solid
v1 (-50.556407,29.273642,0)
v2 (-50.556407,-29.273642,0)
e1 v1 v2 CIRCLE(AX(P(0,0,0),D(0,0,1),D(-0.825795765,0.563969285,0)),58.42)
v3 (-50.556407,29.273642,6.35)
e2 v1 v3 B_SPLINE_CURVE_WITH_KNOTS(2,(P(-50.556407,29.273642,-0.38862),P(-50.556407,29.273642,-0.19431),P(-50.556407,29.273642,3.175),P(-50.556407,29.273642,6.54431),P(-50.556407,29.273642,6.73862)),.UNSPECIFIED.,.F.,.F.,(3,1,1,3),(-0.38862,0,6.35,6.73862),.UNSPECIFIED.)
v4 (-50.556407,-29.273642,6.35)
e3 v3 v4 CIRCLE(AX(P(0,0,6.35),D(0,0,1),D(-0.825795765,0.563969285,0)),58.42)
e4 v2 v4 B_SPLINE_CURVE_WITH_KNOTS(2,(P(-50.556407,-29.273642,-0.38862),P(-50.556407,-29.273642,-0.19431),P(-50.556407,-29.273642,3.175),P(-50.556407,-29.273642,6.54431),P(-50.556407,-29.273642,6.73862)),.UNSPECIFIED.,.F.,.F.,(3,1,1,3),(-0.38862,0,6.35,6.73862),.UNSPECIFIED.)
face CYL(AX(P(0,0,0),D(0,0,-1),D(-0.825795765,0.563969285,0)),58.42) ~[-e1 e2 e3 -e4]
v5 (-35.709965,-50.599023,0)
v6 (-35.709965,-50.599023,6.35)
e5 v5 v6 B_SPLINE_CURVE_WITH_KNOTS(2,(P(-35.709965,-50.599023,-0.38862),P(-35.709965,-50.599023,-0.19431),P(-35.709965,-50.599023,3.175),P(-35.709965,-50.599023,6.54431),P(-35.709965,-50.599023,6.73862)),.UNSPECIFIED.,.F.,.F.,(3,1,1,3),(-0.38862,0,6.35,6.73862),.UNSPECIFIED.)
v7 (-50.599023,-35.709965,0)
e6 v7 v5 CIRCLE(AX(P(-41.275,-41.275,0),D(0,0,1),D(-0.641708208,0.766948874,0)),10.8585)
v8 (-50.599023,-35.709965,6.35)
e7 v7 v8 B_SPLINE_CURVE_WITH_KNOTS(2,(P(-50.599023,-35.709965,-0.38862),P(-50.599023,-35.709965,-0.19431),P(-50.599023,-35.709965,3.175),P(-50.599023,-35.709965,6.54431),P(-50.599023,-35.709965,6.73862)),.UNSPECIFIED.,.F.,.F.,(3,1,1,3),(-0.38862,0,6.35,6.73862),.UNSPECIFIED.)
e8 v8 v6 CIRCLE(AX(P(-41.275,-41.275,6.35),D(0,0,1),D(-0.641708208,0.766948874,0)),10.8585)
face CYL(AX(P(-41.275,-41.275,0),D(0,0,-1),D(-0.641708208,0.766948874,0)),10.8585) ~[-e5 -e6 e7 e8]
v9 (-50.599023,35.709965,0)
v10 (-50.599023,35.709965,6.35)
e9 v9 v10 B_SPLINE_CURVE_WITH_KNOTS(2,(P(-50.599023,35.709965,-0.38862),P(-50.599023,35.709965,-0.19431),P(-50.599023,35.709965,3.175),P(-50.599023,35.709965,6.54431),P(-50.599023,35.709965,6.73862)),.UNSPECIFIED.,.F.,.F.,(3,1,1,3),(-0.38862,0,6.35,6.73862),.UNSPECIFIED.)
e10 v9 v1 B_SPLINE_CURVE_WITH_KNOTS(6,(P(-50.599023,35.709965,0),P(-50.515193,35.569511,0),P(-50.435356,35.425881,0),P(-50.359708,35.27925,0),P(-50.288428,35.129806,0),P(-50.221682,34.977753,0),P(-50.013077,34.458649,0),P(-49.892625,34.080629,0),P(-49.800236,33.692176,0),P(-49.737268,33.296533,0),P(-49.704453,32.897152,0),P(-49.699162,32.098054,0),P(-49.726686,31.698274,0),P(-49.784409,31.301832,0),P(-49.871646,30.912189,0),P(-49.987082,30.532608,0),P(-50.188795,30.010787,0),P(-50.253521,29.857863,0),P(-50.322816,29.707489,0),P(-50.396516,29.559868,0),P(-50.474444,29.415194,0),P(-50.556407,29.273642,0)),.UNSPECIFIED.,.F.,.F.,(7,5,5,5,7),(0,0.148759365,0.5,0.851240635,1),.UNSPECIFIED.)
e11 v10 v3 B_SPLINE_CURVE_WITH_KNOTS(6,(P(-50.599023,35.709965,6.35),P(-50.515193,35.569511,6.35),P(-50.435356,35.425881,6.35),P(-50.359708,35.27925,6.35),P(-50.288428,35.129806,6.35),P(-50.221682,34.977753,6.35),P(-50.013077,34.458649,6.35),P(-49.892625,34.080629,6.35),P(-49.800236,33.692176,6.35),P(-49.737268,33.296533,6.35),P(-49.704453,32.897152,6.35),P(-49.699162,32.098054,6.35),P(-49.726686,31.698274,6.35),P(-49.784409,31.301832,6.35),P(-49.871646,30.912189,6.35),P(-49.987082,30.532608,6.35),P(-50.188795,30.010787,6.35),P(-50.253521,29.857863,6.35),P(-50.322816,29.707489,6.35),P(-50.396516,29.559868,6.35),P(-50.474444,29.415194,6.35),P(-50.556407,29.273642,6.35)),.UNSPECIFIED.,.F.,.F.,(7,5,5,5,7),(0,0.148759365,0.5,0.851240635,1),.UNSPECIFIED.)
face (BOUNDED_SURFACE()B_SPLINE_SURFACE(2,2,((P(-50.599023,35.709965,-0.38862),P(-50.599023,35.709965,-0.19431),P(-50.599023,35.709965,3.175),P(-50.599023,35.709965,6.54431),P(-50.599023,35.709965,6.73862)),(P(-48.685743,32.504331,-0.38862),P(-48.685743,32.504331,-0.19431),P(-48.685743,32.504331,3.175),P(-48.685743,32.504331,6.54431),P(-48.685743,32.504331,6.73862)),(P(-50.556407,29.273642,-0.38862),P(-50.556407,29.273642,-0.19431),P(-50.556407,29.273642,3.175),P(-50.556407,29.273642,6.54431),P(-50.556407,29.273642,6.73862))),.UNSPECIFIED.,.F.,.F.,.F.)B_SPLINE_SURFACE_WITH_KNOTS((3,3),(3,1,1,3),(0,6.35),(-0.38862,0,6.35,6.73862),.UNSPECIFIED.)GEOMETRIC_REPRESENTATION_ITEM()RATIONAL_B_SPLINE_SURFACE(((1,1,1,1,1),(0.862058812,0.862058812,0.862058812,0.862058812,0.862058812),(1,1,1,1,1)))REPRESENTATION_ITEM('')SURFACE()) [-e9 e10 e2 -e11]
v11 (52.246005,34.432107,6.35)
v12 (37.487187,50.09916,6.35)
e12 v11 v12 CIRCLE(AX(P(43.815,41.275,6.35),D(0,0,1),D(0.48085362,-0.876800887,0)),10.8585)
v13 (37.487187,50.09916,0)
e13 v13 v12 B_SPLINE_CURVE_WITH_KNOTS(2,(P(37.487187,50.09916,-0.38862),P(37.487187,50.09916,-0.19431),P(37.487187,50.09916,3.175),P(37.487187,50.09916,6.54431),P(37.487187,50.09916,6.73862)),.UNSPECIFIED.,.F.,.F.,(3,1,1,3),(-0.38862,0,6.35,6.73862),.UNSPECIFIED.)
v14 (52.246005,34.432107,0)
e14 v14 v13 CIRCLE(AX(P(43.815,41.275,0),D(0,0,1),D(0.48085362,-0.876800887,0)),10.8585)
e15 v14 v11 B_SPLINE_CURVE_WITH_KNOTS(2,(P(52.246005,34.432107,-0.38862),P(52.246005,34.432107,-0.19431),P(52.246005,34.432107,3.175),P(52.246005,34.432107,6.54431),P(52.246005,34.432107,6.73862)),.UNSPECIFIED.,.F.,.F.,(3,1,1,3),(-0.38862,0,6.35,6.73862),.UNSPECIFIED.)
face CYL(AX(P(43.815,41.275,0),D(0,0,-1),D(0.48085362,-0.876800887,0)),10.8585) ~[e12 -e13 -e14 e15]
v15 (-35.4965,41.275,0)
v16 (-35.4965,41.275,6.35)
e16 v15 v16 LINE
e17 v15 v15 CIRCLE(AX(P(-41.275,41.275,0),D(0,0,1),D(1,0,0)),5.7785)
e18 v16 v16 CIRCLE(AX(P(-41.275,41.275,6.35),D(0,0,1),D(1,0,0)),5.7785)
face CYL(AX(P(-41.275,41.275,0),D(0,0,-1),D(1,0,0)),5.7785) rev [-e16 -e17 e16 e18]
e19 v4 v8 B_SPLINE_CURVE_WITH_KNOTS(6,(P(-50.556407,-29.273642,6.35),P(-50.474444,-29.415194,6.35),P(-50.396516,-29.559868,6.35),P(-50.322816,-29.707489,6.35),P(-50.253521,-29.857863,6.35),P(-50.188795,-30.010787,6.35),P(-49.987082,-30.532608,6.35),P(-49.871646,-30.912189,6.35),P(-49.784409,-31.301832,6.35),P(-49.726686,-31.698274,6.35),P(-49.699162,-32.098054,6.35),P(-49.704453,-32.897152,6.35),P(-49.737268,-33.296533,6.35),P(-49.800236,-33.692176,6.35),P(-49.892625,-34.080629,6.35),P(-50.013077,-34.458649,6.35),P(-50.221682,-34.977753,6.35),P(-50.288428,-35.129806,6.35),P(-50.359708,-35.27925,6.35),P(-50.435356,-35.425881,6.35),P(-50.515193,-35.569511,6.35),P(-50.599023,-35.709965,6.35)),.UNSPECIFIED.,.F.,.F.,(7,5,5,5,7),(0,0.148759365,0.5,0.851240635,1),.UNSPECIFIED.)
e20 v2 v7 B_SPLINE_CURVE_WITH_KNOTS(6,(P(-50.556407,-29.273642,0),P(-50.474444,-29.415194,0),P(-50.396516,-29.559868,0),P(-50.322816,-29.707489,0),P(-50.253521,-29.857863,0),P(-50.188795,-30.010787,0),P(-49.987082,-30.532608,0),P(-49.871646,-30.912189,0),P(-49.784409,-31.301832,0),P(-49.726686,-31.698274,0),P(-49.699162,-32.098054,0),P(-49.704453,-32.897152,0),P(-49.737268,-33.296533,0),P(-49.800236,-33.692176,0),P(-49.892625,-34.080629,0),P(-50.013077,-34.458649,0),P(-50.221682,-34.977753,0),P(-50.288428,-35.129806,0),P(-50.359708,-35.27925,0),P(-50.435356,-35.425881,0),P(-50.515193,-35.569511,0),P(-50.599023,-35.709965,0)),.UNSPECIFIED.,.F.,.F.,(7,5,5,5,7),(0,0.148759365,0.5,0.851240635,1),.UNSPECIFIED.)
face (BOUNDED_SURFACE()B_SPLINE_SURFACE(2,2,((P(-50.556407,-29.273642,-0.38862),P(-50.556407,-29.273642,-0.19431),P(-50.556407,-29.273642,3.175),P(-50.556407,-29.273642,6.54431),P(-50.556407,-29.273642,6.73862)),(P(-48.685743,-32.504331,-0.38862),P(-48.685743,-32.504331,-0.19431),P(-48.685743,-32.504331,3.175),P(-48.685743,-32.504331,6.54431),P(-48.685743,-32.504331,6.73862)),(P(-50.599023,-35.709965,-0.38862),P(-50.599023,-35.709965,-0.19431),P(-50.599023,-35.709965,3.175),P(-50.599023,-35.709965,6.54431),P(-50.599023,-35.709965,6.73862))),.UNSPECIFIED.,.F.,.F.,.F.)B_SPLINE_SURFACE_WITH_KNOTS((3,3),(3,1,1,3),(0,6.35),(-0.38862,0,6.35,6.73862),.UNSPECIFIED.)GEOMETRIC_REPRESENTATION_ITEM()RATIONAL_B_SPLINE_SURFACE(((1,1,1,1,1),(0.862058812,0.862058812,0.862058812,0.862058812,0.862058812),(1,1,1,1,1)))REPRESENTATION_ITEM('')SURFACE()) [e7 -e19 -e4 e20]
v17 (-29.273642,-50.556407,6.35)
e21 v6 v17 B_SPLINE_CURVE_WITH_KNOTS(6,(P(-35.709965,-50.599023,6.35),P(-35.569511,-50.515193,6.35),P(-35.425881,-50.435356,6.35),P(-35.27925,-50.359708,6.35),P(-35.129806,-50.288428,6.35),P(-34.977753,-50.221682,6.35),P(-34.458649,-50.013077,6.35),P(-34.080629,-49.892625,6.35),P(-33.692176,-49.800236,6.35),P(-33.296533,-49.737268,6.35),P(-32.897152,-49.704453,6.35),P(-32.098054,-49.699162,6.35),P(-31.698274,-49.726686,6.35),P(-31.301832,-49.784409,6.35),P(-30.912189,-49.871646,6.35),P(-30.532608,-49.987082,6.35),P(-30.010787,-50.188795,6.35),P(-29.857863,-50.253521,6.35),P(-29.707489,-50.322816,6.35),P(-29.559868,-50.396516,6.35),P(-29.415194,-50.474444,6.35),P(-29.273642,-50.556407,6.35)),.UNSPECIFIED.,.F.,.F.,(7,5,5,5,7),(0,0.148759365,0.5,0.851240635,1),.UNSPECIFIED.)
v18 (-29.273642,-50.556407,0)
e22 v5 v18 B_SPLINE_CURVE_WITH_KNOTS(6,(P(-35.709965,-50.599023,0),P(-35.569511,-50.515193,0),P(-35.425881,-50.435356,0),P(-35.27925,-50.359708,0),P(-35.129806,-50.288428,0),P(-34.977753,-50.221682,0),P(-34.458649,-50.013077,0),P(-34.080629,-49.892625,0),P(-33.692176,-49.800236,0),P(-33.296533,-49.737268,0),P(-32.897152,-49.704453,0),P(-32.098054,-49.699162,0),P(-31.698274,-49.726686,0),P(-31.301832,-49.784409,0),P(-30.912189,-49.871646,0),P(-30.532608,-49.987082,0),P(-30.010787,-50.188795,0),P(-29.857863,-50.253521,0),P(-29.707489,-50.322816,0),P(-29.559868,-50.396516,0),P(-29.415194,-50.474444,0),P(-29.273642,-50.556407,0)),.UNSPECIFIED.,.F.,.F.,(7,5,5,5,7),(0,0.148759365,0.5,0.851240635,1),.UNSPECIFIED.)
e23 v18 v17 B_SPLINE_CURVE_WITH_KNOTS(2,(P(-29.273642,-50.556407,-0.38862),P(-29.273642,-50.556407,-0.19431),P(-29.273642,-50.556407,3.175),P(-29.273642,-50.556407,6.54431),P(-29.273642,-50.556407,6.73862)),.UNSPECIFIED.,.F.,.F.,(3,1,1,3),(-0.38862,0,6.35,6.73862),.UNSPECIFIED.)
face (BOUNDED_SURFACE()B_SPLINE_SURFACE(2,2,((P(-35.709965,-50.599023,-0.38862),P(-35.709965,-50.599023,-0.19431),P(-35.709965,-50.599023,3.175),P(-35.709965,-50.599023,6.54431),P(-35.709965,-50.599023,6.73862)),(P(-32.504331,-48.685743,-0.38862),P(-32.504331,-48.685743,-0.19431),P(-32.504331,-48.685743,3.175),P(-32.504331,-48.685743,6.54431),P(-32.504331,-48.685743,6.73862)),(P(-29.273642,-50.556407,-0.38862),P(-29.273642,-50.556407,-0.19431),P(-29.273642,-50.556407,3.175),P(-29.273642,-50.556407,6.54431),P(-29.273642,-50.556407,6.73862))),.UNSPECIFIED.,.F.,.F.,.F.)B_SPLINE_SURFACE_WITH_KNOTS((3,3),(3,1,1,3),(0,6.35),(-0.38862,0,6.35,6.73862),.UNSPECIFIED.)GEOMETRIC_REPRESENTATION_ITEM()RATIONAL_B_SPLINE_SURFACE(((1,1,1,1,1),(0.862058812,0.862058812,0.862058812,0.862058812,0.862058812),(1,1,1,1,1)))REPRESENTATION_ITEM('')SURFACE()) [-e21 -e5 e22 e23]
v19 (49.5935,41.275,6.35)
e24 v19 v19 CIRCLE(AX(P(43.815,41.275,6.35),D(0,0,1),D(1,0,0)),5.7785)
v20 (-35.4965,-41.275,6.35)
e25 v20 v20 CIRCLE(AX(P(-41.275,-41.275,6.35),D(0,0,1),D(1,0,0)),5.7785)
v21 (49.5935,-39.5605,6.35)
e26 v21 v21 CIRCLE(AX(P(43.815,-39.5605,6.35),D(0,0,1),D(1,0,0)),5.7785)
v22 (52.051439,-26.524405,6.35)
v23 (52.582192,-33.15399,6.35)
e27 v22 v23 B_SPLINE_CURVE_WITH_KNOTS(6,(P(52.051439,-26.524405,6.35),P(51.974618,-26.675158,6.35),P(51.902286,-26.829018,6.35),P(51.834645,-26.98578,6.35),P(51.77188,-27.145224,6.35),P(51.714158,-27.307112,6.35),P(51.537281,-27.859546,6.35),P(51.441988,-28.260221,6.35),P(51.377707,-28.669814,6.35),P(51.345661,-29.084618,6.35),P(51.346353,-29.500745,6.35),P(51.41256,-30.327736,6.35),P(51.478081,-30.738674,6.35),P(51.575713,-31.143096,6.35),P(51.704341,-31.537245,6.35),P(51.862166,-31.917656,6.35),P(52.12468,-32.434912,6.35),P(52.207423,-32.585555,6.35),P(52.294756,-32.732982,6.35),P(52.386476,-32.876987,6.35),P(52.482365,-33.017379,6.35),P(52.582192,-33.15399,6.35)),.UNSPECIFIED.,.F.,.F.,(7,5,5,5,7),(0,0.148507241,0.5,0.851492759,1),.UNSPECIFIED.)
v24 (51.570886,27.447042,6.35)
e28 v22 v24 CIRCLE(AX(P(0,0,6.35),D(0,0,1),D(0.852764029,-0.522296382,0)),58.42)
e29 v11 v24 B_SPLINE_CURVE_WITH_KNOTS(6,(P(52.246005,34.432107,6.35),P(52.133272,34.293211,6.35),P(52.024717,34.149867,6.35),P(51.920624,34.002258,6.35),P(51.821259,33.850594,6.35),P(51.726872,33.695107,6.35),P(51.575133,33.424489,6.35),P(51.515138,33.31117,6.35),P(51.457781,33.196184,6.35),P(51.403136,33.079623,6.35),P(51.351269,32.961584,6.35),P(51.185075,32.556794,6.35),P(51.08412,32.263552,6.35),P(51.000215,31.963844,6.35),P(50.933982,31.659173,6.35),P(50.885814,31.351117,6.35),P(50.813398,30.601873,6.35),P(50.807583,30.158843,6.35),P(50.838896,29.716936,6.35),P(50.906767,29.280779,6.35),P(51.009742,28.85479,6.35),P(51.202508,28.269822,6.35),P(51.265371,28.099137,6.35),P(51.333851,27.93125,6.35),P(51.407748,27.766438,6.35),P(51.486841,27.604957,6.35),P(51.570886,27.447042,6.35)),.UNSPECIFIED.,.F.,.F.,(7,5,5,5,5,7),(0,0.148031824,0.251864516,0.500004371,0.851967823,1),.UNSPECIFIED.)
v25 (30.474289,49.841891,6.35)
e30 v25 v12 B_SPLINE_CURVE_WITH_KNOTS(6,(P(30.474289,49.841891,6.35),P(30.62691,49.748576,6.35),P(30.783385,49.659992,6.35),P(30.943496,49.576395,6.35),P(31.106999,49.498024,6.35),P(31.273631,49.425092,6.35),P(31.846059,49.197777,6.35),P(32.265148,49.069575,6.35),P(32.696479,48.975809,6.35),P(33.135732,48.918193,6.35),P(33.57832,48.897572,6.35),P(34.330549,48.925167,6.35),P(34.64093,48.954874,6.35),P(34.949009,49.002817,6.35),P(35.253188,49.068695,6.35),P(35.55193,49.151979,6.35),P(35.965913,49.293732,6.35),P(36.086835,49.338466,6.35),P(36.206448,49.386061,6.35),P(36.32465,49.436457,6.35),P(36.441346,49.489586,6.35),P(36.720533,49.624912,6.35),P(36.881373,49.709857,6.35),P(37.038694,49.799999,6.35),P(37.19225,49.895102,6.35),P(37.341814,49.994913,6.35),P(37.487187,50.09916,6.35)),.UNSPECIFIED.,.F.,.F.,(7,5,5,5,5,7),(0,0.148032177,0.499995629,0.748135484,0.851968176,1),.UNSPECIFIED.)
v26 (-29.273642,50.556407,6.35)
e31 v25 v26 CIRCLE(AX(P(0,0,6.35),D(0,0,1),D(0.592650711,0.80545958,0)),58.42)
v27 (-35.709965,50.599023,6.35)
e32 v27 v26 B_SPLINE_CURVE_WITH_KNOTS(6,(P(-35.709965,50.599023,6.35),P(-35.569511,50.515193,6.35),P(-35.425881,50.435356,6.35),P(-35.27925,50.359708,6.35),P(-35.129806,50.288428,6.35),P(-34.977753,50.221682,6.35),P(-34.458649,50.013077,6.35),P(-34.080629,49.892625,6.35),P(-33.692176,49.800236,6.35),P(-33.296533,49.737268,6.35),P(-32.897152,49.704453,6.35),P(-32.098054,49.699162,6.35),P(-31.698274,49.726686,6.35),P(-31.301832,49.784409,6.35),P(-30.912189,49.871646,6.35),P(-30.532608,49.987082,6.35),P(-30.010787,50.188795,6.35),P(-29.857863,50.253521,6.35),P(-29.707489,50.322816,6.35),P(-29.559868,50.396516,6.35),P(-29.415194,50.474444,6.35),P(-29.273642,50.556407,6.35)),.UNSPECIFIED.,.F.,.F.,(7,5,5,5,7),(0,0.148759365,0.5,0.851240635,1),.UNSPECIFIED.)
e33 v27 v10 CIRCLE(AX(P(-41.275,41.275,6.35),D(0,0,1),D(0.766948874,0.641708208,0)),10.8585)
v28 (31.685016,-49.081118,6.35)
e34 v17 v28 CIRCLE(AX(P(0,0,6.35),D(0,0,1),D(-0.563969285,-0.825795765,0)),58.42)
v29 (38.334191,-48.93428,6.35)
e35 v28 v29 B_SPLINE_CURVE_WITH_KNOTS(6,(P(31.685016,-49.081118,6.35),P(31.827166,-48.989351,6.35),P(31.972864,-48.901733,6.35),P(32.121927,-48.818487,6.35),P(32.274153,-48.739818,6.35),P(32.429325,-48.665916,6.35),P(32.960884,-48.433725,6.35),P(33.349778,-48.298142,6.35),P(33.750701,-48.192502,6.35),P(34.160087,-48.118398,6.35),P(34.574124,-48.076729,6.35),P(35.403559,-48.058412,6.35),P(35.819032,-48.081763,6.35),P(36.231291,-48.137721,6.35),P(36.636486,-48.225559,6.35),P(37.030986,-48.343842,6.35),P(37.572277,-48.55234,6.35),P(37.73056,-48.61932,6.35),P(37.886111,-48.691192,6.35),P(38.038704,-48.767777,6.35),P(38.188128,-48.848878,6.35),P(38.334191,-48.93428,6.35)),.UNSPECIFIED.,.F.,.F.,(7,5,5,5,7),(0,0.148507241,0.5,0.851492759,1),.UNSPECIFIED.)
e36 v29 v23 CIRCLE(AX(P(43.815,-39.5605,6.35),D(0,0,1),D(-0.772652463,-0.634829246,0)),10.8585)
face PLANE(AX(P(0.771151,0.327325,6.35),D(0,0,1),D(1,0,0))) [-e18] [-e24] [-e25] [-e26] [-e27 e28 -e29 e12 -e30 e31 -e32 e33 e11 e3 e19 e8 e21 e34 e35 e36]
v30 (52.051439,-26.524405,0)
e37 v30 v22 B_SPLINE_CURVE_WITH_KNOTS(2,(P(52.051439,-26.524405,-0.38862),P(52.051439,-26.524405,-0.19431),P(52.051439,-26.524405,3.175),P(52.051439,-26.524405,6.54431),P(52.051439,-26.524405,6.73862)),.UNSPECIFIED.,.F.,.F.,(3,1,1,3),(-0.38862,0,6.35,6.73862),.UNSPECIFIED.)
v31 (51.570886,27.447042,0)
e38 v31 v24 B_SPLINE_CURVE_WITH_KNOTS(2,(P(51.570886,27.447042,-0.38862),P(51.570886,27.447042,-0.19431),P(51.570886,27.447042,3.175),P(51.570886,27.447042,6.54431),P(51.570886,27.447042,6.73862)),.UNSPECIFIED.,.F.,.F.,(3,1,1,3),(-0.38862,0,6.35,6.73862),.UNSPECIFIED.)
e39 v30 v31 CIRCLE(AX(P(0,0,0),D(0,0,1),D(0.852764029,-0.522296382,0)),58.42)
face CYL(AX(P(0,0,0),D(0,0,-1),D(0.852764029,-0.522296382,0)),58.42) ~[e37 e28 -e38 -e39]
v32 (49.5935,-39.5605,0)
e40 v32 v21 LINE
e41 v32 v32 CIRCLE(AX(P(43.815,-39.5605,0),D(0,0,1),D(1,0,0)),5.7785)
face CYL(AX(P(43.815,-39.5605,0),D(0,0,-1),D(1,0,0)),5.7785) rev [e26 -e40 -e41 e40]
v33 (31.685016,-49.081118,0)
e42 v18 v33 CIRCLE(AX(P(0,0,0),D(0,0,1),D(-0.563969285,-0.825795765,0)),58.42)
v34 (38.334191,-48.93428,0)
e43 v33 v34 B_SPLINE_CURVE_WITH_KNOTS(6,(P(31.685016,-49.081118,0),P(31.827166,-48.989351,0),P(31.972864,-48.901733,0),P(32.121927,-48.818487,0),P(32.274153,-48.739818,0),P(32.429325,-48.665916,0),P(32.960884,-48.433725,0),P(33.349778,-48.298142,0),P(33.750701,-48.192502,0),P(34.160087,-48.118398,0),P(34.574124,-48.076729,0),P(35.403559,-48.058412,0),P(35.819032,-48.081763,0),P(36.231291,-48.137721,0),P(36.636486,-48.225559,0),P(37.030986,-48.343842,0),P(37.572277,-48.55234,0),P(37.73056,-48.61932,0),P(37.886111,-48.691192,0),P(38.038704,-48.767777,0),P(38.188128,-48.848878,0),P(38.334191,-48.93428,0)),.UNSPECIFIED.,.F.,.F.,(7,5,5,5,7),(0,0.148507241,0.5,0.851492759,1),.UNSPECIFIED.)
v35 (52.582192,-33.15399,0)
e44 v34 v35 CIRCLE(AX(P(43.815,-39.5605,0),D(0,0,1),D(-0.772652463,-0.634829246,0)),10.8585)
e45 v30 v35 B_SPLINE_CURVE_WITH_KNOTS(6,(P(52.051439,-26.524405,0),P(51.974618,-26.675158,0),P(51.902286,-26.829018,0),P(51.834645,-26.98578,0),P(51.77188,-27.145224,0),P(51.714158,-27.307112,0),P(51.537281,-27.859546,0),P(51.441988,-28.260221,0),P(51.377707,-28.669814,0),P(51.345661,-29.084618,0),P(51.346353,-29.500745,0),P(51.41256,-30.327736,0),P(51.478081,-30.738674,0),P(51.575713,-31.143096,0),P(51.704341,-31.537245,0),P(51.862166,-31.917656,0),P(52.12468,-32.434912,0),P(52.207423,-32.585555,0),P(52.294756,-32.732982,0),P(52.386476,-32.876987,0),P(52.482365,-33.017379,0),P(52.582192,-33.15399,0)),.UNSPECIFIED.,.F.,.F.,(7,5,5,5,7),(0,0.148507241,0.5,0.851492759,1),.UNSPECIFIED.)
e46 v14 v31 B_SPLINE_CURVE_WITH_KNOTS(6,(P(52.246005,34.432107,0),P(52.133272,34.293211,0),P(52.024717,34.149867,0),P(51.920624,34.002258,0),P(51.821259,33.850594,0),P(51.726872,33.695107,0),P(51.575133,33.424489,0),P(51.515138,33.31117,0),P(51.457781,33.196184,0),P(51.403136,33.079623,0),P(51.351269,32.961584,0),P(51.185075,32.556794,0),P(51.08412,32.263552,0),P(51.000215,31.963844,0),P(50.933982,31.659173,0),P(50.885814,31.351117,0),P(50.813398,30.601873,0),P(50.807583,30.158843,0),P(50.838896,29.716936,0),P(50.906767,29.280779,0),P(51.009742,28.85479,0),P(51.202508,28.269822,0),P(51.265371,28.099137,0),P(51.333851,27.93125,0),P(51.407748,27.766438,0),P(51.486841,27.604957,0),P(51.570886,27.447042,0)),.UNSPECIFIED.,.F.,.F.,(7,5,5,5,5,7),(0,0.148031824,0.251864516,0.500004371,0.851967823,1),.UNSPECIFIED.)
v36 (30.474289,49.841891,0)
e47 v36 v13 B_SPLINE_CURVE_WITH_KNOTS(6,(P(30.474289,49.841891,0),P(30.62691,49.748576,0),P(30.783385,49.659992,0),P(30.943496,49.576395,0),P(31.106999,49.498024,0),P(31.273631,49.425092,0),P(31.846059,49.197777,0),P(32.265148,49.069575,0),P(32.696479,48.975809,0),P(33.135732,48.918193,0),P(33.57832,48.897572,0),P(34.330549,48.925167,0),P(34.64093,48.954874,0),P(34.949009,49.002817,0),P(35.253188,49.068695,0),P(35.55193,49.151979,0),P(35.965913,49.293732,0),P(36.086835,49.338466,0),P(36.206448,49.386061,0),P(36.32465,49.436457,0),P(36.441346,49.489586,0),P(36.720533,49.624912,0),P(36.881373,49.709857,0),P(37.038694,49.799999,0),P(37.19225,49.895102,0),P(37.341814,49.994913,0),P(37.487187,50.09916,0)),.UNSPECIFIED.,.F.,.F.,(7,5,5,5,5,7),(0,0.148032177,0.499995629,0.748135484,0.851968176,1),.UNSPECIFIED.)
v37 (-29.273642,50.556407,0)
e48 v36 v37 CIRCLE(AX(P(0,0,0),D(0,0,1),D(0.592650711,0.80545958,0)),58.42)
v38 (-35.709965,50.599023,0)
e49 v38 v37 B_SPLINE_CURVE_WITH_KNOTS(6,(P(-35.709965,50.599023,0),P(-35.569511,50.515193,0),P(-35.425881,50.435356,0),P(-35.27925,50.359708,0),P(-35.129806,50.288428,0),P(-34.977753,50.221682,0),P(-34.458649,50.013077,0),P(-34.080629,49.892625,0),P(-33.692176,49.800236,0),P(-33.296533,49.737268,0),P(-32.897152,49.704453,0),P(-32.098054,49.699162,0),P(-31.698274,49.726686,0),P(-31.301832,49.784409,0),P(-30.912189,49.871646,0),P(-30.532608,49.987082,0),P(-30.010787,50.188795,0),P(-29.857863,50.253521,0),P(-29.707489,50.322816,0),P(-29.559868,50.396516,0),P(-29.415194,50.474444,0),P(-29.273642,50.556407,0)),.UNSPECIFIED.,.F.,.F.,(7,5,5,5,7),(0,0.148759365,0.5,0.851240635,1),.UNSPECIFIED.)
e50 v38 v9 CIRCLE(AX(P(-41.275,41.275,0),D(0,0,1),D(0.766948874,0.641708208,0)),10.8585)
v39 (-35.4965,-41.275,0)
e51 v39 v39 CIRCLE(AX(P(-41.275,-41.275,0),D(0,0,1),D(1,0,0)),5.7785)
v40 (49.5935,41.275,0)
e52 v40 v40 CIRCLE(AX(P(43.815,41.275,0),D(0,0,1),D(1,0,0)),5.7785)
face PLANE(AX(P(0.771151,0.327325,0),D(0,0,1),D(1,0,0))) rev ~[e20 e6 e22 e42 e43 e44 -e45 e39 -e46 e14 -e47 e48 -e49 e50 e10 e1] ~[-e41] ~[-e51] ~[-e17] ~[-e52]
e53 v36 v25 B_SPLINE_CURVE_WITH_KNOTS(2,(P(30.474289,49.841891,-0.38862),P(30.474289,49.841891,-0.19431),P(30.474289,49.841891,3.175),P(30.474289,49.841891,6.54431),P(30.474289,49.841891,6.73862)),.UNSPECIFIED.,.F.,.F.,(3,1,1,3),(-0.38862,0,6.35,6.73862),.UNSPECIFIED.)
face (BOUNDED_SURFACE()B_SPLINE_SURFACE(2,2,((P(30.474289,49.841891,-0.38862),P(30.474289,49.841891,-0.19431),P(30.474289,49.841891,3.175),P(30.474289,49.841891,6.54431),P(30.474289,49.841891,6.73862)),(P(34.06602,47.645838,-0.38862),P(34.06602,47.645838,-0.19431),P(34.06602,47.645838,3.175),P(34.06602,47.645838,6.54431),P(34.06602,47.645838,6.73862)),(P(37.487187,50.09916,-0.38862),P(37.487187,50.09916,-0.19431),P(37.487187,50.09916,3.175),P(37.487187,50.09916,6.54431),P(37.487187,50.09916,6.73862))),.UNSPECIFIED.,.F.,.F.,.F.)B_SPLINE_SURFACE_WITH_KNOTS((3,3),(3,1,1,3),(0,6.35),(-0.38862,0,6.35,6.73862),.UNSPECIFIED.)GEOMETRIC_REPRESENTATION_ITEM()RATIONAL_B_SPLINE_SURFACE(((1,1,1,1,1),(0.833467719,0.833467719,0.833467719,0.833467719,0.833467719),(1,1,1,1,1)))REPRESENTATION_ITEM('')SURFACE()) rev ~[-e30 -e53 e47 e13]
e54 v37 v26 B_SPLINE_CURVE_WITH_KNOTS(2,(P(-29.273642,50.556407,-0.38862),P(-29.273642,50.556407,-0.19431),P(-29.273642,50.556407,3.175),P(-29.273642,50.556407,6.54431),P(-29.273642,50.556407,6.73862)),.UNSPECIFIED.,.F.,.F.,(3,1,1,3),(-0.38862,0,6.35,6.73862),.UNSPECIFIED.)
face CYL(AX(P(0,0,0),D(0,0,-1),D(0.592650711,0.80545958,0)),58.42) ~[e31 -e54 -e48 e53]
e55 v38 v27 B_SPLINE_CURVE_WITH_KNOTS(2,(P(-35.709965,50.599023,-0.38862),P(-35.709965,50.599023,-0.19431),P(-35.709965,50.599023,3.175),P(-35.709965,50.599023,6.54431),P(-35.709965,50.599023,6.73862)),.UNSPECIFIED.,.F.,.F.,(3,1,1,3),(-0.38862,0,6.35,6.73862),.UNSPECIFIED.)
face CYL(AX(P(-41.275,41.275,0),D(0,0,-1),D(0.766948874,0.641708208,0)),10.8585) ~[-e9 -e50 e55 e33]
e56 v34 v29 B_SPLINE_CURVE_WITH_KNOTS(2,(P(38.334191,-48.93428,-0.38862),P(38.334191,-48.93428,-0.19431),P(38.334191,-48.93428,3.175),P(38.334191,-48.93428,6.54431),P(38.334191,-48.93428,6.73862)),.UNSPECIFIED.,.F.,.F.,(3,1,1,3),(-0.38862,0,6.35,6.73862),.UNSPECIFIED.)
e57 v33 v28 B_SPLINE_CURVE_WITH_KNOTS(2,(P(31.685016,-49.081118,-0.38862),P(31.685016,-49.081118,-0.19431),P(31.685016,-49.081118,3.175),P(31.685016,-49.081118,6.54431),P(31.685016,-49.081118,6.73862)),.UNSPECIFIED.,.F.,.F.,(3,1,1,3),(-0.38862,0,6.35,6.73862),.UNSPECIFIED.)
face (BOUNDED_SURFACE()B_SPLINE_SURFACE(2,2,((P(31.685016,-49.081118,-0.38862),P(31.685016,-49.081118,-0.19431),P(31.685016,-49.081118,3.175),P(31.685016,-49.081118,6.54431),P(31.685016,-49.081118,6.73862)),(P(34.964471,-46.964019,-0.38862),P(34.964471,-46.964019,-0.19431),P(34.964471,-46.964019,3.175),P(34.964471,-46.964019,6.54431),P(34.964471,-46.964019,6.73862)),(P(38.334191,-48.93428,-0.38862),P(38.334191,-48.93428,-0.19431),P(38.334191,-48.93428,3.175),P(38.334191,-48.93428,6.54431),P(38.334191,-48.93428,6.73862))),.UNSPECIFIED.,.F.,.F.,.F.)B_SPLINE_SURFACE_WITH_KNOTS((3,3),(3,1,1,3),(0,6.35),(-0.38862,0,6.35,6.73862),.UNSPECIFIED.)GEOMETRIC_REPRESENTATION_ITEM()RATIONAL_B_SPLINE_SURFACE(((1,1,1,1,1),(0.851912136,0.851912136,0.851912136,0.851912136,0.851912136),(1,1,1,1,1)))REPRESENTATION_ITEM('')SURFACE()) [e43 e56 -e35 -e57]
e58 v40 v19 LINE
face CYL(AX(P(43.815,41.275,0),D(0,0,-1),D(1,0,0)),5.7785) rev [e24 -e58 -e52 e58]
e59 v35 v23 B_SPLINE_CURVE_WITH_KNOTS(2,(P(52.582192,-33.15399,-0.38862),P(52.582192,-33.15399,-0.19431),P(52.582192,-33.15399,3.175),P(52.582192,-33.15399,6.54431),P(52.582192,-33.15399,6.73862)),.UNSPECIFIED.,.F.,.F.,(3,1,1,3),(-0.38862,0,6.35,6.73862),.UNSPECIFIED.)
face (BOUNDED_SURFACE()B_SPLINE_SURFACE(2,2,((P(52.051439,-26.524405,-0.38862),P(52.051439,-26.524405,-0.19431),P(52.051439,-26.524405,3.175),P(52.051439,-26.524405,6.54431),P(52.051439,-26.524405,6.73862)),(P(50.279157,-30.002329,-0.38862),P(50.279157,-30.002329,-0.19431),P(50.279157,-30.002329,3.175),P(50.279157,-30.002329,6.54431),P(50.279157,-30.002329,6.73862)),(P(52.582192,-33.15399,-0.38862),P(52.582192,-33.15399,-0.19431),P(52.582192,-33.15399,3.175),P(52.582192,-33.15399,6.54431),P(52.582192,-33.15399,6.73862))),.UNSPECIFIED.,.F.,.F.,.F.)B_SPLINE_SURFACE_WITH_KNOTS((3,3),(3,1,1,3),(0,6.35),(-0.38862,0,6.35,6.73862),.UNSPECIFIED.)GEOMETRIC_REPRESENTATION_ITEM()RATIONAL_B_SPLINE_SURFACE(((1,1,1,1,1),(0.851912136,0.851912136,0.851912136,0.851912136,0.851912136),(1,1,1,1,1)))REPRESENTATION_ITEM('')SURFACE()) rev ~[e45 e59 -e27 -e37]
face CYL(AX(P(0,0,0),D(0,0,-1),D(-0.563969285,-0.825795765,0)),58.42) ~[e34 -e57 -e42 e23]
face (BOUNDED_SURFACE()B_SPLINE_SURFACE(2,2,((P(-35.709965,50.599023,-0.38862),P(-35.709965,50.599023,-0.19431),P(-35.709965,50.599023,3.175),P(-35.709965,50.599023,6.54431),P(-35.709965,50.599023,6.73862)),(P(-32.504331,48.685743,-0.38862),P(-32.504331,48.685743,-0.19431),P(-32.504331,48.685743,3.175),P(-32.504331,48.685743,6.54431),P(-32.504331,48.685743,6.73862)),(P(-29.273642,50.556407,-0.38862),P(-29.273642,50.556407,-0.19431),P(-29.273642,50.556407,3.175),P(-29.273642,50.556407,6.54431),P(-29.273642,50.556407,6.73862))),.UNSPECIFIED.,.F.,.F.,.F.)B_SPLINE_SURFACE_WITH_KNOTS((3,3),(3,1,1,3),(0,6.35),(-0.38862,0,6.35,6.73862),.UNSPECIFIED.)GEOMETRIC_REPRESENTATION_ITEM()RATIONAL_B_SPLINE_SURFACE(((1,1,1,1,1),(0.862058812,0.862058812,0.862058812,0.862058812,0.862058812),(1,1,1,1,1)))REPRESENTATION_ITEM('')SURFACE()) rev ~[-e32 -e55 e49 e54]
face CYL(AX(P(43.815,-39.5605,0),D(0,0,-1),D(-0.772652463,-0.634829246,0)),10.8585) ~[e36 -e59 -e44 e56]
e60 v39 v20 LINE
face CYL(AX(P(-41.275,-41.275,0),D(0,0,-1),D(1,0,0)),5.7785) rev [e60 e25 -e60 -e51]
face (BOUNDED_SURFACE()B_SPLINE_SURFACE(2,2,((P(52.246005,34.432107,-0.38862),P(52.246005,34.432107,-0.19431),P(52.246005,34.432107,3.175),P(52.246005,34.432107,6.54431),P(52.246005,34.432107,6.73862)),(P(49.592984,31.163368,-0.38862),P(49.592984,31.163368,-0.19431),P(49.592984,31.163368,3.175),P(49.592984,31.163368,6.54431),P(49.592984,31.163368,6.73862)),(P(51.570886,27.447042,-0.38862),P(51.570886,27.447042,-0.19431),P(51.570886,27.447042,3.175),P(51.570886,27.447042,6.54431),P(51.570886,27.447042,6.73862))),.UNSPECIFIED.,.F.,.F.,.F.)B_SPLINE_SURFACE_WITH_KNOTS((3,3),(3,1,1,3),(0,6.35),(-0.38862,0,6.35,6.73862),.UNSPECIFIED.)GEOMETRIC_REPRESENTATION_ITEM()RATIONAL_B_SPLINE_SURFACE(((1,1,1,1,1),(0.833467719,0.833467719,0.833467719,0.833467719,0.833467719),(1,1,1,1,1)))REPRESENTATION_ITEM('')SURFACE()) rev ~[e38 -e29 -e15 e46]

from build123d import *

# Parameters (mm, degrees)
F0_R     = 5.7785
F1_DEPTH = 6.35
F2_R     = 6.35


with BuildPart() as f1:
    # F0 (on Top) → F1 (new body)
    with BuildSketch(Plane.XY):
        with BuildLine():
            ThreePointArc((-32.9470856511, 48.2429885797), (-48.9531189835, 48.9531189835), (-48.2429885797, 32.9470856511))
            ThreePointArc((-48.2429885797, 32.9470856511), (-58.42, 0), (-48.2429885797, -32.9470856511))
            ThreePointArc((-48.2429885797, -32.9470856511), (-48.9531189835, -48.9531189835), (-32.9470856511, -48.2429885797))
            ThreePointArc((-32.9470856511, -48.2429885797), (1.5282374195, -58.4000076232), (35.4251532331, -46.4537933695))
            ThreePointArc((35.4251532331, -46.4537933695), (51.8744333617, -46.8373507019), (49.8184745785, -30.5125546401))
            ThreePointArc((49.8184745785, -30.5125546401), (58.4153919217, 0.7337483426), (49.0363490334, 31.7542575646))
            ThreePointArc((49.0363490334, 31.7542575646), (51.7187959431, 48.720604874), (34.622654511, 47.0549486729))
            ThreePointArc((34.622654511, 47.0549486729), (1.0270065512, 58.4109720647), (-32.9470856511, 48.2429885797))
        make_face()
        with Locations((-41.275, -41.275)):
            Circle(F0_R, mode=Mode.SUBTRACT)
        with Locations((43.815, -39.5605)):
            Circle(F0_R, mode=Mode.SUBTRACT)
        with Locations((-41.275, 41.275)):
            Circle(F0_R, mode=Mode.SUBTRACT)
        with Locations((43.815, 41.275)):
            Circle(F0_R, mode=Mode.SUBTRACT)
    extrude(amount=F1_DEPTH)

    # F2
    f2_edges = [f1.edges().sort_by_distance(p)[0] for p in [
        (-48.242989, 32.947086, 3.175),
        (35.425153, -46.453793, 3.175),
        (49.818475, -30.512555, 3.175),
        (-32.947086, 48.242989, 3.175),
        (34.622655, 47.054949, 3.175),
        (49.036349, 31.754258, 3.175),
        (-48.242989, -32.947086, 3.175),
        (-32.947086, -48.242989, 3.175),
    ]]
    fillet(f2_edges, radius=F2_R)


solid = f1.part
